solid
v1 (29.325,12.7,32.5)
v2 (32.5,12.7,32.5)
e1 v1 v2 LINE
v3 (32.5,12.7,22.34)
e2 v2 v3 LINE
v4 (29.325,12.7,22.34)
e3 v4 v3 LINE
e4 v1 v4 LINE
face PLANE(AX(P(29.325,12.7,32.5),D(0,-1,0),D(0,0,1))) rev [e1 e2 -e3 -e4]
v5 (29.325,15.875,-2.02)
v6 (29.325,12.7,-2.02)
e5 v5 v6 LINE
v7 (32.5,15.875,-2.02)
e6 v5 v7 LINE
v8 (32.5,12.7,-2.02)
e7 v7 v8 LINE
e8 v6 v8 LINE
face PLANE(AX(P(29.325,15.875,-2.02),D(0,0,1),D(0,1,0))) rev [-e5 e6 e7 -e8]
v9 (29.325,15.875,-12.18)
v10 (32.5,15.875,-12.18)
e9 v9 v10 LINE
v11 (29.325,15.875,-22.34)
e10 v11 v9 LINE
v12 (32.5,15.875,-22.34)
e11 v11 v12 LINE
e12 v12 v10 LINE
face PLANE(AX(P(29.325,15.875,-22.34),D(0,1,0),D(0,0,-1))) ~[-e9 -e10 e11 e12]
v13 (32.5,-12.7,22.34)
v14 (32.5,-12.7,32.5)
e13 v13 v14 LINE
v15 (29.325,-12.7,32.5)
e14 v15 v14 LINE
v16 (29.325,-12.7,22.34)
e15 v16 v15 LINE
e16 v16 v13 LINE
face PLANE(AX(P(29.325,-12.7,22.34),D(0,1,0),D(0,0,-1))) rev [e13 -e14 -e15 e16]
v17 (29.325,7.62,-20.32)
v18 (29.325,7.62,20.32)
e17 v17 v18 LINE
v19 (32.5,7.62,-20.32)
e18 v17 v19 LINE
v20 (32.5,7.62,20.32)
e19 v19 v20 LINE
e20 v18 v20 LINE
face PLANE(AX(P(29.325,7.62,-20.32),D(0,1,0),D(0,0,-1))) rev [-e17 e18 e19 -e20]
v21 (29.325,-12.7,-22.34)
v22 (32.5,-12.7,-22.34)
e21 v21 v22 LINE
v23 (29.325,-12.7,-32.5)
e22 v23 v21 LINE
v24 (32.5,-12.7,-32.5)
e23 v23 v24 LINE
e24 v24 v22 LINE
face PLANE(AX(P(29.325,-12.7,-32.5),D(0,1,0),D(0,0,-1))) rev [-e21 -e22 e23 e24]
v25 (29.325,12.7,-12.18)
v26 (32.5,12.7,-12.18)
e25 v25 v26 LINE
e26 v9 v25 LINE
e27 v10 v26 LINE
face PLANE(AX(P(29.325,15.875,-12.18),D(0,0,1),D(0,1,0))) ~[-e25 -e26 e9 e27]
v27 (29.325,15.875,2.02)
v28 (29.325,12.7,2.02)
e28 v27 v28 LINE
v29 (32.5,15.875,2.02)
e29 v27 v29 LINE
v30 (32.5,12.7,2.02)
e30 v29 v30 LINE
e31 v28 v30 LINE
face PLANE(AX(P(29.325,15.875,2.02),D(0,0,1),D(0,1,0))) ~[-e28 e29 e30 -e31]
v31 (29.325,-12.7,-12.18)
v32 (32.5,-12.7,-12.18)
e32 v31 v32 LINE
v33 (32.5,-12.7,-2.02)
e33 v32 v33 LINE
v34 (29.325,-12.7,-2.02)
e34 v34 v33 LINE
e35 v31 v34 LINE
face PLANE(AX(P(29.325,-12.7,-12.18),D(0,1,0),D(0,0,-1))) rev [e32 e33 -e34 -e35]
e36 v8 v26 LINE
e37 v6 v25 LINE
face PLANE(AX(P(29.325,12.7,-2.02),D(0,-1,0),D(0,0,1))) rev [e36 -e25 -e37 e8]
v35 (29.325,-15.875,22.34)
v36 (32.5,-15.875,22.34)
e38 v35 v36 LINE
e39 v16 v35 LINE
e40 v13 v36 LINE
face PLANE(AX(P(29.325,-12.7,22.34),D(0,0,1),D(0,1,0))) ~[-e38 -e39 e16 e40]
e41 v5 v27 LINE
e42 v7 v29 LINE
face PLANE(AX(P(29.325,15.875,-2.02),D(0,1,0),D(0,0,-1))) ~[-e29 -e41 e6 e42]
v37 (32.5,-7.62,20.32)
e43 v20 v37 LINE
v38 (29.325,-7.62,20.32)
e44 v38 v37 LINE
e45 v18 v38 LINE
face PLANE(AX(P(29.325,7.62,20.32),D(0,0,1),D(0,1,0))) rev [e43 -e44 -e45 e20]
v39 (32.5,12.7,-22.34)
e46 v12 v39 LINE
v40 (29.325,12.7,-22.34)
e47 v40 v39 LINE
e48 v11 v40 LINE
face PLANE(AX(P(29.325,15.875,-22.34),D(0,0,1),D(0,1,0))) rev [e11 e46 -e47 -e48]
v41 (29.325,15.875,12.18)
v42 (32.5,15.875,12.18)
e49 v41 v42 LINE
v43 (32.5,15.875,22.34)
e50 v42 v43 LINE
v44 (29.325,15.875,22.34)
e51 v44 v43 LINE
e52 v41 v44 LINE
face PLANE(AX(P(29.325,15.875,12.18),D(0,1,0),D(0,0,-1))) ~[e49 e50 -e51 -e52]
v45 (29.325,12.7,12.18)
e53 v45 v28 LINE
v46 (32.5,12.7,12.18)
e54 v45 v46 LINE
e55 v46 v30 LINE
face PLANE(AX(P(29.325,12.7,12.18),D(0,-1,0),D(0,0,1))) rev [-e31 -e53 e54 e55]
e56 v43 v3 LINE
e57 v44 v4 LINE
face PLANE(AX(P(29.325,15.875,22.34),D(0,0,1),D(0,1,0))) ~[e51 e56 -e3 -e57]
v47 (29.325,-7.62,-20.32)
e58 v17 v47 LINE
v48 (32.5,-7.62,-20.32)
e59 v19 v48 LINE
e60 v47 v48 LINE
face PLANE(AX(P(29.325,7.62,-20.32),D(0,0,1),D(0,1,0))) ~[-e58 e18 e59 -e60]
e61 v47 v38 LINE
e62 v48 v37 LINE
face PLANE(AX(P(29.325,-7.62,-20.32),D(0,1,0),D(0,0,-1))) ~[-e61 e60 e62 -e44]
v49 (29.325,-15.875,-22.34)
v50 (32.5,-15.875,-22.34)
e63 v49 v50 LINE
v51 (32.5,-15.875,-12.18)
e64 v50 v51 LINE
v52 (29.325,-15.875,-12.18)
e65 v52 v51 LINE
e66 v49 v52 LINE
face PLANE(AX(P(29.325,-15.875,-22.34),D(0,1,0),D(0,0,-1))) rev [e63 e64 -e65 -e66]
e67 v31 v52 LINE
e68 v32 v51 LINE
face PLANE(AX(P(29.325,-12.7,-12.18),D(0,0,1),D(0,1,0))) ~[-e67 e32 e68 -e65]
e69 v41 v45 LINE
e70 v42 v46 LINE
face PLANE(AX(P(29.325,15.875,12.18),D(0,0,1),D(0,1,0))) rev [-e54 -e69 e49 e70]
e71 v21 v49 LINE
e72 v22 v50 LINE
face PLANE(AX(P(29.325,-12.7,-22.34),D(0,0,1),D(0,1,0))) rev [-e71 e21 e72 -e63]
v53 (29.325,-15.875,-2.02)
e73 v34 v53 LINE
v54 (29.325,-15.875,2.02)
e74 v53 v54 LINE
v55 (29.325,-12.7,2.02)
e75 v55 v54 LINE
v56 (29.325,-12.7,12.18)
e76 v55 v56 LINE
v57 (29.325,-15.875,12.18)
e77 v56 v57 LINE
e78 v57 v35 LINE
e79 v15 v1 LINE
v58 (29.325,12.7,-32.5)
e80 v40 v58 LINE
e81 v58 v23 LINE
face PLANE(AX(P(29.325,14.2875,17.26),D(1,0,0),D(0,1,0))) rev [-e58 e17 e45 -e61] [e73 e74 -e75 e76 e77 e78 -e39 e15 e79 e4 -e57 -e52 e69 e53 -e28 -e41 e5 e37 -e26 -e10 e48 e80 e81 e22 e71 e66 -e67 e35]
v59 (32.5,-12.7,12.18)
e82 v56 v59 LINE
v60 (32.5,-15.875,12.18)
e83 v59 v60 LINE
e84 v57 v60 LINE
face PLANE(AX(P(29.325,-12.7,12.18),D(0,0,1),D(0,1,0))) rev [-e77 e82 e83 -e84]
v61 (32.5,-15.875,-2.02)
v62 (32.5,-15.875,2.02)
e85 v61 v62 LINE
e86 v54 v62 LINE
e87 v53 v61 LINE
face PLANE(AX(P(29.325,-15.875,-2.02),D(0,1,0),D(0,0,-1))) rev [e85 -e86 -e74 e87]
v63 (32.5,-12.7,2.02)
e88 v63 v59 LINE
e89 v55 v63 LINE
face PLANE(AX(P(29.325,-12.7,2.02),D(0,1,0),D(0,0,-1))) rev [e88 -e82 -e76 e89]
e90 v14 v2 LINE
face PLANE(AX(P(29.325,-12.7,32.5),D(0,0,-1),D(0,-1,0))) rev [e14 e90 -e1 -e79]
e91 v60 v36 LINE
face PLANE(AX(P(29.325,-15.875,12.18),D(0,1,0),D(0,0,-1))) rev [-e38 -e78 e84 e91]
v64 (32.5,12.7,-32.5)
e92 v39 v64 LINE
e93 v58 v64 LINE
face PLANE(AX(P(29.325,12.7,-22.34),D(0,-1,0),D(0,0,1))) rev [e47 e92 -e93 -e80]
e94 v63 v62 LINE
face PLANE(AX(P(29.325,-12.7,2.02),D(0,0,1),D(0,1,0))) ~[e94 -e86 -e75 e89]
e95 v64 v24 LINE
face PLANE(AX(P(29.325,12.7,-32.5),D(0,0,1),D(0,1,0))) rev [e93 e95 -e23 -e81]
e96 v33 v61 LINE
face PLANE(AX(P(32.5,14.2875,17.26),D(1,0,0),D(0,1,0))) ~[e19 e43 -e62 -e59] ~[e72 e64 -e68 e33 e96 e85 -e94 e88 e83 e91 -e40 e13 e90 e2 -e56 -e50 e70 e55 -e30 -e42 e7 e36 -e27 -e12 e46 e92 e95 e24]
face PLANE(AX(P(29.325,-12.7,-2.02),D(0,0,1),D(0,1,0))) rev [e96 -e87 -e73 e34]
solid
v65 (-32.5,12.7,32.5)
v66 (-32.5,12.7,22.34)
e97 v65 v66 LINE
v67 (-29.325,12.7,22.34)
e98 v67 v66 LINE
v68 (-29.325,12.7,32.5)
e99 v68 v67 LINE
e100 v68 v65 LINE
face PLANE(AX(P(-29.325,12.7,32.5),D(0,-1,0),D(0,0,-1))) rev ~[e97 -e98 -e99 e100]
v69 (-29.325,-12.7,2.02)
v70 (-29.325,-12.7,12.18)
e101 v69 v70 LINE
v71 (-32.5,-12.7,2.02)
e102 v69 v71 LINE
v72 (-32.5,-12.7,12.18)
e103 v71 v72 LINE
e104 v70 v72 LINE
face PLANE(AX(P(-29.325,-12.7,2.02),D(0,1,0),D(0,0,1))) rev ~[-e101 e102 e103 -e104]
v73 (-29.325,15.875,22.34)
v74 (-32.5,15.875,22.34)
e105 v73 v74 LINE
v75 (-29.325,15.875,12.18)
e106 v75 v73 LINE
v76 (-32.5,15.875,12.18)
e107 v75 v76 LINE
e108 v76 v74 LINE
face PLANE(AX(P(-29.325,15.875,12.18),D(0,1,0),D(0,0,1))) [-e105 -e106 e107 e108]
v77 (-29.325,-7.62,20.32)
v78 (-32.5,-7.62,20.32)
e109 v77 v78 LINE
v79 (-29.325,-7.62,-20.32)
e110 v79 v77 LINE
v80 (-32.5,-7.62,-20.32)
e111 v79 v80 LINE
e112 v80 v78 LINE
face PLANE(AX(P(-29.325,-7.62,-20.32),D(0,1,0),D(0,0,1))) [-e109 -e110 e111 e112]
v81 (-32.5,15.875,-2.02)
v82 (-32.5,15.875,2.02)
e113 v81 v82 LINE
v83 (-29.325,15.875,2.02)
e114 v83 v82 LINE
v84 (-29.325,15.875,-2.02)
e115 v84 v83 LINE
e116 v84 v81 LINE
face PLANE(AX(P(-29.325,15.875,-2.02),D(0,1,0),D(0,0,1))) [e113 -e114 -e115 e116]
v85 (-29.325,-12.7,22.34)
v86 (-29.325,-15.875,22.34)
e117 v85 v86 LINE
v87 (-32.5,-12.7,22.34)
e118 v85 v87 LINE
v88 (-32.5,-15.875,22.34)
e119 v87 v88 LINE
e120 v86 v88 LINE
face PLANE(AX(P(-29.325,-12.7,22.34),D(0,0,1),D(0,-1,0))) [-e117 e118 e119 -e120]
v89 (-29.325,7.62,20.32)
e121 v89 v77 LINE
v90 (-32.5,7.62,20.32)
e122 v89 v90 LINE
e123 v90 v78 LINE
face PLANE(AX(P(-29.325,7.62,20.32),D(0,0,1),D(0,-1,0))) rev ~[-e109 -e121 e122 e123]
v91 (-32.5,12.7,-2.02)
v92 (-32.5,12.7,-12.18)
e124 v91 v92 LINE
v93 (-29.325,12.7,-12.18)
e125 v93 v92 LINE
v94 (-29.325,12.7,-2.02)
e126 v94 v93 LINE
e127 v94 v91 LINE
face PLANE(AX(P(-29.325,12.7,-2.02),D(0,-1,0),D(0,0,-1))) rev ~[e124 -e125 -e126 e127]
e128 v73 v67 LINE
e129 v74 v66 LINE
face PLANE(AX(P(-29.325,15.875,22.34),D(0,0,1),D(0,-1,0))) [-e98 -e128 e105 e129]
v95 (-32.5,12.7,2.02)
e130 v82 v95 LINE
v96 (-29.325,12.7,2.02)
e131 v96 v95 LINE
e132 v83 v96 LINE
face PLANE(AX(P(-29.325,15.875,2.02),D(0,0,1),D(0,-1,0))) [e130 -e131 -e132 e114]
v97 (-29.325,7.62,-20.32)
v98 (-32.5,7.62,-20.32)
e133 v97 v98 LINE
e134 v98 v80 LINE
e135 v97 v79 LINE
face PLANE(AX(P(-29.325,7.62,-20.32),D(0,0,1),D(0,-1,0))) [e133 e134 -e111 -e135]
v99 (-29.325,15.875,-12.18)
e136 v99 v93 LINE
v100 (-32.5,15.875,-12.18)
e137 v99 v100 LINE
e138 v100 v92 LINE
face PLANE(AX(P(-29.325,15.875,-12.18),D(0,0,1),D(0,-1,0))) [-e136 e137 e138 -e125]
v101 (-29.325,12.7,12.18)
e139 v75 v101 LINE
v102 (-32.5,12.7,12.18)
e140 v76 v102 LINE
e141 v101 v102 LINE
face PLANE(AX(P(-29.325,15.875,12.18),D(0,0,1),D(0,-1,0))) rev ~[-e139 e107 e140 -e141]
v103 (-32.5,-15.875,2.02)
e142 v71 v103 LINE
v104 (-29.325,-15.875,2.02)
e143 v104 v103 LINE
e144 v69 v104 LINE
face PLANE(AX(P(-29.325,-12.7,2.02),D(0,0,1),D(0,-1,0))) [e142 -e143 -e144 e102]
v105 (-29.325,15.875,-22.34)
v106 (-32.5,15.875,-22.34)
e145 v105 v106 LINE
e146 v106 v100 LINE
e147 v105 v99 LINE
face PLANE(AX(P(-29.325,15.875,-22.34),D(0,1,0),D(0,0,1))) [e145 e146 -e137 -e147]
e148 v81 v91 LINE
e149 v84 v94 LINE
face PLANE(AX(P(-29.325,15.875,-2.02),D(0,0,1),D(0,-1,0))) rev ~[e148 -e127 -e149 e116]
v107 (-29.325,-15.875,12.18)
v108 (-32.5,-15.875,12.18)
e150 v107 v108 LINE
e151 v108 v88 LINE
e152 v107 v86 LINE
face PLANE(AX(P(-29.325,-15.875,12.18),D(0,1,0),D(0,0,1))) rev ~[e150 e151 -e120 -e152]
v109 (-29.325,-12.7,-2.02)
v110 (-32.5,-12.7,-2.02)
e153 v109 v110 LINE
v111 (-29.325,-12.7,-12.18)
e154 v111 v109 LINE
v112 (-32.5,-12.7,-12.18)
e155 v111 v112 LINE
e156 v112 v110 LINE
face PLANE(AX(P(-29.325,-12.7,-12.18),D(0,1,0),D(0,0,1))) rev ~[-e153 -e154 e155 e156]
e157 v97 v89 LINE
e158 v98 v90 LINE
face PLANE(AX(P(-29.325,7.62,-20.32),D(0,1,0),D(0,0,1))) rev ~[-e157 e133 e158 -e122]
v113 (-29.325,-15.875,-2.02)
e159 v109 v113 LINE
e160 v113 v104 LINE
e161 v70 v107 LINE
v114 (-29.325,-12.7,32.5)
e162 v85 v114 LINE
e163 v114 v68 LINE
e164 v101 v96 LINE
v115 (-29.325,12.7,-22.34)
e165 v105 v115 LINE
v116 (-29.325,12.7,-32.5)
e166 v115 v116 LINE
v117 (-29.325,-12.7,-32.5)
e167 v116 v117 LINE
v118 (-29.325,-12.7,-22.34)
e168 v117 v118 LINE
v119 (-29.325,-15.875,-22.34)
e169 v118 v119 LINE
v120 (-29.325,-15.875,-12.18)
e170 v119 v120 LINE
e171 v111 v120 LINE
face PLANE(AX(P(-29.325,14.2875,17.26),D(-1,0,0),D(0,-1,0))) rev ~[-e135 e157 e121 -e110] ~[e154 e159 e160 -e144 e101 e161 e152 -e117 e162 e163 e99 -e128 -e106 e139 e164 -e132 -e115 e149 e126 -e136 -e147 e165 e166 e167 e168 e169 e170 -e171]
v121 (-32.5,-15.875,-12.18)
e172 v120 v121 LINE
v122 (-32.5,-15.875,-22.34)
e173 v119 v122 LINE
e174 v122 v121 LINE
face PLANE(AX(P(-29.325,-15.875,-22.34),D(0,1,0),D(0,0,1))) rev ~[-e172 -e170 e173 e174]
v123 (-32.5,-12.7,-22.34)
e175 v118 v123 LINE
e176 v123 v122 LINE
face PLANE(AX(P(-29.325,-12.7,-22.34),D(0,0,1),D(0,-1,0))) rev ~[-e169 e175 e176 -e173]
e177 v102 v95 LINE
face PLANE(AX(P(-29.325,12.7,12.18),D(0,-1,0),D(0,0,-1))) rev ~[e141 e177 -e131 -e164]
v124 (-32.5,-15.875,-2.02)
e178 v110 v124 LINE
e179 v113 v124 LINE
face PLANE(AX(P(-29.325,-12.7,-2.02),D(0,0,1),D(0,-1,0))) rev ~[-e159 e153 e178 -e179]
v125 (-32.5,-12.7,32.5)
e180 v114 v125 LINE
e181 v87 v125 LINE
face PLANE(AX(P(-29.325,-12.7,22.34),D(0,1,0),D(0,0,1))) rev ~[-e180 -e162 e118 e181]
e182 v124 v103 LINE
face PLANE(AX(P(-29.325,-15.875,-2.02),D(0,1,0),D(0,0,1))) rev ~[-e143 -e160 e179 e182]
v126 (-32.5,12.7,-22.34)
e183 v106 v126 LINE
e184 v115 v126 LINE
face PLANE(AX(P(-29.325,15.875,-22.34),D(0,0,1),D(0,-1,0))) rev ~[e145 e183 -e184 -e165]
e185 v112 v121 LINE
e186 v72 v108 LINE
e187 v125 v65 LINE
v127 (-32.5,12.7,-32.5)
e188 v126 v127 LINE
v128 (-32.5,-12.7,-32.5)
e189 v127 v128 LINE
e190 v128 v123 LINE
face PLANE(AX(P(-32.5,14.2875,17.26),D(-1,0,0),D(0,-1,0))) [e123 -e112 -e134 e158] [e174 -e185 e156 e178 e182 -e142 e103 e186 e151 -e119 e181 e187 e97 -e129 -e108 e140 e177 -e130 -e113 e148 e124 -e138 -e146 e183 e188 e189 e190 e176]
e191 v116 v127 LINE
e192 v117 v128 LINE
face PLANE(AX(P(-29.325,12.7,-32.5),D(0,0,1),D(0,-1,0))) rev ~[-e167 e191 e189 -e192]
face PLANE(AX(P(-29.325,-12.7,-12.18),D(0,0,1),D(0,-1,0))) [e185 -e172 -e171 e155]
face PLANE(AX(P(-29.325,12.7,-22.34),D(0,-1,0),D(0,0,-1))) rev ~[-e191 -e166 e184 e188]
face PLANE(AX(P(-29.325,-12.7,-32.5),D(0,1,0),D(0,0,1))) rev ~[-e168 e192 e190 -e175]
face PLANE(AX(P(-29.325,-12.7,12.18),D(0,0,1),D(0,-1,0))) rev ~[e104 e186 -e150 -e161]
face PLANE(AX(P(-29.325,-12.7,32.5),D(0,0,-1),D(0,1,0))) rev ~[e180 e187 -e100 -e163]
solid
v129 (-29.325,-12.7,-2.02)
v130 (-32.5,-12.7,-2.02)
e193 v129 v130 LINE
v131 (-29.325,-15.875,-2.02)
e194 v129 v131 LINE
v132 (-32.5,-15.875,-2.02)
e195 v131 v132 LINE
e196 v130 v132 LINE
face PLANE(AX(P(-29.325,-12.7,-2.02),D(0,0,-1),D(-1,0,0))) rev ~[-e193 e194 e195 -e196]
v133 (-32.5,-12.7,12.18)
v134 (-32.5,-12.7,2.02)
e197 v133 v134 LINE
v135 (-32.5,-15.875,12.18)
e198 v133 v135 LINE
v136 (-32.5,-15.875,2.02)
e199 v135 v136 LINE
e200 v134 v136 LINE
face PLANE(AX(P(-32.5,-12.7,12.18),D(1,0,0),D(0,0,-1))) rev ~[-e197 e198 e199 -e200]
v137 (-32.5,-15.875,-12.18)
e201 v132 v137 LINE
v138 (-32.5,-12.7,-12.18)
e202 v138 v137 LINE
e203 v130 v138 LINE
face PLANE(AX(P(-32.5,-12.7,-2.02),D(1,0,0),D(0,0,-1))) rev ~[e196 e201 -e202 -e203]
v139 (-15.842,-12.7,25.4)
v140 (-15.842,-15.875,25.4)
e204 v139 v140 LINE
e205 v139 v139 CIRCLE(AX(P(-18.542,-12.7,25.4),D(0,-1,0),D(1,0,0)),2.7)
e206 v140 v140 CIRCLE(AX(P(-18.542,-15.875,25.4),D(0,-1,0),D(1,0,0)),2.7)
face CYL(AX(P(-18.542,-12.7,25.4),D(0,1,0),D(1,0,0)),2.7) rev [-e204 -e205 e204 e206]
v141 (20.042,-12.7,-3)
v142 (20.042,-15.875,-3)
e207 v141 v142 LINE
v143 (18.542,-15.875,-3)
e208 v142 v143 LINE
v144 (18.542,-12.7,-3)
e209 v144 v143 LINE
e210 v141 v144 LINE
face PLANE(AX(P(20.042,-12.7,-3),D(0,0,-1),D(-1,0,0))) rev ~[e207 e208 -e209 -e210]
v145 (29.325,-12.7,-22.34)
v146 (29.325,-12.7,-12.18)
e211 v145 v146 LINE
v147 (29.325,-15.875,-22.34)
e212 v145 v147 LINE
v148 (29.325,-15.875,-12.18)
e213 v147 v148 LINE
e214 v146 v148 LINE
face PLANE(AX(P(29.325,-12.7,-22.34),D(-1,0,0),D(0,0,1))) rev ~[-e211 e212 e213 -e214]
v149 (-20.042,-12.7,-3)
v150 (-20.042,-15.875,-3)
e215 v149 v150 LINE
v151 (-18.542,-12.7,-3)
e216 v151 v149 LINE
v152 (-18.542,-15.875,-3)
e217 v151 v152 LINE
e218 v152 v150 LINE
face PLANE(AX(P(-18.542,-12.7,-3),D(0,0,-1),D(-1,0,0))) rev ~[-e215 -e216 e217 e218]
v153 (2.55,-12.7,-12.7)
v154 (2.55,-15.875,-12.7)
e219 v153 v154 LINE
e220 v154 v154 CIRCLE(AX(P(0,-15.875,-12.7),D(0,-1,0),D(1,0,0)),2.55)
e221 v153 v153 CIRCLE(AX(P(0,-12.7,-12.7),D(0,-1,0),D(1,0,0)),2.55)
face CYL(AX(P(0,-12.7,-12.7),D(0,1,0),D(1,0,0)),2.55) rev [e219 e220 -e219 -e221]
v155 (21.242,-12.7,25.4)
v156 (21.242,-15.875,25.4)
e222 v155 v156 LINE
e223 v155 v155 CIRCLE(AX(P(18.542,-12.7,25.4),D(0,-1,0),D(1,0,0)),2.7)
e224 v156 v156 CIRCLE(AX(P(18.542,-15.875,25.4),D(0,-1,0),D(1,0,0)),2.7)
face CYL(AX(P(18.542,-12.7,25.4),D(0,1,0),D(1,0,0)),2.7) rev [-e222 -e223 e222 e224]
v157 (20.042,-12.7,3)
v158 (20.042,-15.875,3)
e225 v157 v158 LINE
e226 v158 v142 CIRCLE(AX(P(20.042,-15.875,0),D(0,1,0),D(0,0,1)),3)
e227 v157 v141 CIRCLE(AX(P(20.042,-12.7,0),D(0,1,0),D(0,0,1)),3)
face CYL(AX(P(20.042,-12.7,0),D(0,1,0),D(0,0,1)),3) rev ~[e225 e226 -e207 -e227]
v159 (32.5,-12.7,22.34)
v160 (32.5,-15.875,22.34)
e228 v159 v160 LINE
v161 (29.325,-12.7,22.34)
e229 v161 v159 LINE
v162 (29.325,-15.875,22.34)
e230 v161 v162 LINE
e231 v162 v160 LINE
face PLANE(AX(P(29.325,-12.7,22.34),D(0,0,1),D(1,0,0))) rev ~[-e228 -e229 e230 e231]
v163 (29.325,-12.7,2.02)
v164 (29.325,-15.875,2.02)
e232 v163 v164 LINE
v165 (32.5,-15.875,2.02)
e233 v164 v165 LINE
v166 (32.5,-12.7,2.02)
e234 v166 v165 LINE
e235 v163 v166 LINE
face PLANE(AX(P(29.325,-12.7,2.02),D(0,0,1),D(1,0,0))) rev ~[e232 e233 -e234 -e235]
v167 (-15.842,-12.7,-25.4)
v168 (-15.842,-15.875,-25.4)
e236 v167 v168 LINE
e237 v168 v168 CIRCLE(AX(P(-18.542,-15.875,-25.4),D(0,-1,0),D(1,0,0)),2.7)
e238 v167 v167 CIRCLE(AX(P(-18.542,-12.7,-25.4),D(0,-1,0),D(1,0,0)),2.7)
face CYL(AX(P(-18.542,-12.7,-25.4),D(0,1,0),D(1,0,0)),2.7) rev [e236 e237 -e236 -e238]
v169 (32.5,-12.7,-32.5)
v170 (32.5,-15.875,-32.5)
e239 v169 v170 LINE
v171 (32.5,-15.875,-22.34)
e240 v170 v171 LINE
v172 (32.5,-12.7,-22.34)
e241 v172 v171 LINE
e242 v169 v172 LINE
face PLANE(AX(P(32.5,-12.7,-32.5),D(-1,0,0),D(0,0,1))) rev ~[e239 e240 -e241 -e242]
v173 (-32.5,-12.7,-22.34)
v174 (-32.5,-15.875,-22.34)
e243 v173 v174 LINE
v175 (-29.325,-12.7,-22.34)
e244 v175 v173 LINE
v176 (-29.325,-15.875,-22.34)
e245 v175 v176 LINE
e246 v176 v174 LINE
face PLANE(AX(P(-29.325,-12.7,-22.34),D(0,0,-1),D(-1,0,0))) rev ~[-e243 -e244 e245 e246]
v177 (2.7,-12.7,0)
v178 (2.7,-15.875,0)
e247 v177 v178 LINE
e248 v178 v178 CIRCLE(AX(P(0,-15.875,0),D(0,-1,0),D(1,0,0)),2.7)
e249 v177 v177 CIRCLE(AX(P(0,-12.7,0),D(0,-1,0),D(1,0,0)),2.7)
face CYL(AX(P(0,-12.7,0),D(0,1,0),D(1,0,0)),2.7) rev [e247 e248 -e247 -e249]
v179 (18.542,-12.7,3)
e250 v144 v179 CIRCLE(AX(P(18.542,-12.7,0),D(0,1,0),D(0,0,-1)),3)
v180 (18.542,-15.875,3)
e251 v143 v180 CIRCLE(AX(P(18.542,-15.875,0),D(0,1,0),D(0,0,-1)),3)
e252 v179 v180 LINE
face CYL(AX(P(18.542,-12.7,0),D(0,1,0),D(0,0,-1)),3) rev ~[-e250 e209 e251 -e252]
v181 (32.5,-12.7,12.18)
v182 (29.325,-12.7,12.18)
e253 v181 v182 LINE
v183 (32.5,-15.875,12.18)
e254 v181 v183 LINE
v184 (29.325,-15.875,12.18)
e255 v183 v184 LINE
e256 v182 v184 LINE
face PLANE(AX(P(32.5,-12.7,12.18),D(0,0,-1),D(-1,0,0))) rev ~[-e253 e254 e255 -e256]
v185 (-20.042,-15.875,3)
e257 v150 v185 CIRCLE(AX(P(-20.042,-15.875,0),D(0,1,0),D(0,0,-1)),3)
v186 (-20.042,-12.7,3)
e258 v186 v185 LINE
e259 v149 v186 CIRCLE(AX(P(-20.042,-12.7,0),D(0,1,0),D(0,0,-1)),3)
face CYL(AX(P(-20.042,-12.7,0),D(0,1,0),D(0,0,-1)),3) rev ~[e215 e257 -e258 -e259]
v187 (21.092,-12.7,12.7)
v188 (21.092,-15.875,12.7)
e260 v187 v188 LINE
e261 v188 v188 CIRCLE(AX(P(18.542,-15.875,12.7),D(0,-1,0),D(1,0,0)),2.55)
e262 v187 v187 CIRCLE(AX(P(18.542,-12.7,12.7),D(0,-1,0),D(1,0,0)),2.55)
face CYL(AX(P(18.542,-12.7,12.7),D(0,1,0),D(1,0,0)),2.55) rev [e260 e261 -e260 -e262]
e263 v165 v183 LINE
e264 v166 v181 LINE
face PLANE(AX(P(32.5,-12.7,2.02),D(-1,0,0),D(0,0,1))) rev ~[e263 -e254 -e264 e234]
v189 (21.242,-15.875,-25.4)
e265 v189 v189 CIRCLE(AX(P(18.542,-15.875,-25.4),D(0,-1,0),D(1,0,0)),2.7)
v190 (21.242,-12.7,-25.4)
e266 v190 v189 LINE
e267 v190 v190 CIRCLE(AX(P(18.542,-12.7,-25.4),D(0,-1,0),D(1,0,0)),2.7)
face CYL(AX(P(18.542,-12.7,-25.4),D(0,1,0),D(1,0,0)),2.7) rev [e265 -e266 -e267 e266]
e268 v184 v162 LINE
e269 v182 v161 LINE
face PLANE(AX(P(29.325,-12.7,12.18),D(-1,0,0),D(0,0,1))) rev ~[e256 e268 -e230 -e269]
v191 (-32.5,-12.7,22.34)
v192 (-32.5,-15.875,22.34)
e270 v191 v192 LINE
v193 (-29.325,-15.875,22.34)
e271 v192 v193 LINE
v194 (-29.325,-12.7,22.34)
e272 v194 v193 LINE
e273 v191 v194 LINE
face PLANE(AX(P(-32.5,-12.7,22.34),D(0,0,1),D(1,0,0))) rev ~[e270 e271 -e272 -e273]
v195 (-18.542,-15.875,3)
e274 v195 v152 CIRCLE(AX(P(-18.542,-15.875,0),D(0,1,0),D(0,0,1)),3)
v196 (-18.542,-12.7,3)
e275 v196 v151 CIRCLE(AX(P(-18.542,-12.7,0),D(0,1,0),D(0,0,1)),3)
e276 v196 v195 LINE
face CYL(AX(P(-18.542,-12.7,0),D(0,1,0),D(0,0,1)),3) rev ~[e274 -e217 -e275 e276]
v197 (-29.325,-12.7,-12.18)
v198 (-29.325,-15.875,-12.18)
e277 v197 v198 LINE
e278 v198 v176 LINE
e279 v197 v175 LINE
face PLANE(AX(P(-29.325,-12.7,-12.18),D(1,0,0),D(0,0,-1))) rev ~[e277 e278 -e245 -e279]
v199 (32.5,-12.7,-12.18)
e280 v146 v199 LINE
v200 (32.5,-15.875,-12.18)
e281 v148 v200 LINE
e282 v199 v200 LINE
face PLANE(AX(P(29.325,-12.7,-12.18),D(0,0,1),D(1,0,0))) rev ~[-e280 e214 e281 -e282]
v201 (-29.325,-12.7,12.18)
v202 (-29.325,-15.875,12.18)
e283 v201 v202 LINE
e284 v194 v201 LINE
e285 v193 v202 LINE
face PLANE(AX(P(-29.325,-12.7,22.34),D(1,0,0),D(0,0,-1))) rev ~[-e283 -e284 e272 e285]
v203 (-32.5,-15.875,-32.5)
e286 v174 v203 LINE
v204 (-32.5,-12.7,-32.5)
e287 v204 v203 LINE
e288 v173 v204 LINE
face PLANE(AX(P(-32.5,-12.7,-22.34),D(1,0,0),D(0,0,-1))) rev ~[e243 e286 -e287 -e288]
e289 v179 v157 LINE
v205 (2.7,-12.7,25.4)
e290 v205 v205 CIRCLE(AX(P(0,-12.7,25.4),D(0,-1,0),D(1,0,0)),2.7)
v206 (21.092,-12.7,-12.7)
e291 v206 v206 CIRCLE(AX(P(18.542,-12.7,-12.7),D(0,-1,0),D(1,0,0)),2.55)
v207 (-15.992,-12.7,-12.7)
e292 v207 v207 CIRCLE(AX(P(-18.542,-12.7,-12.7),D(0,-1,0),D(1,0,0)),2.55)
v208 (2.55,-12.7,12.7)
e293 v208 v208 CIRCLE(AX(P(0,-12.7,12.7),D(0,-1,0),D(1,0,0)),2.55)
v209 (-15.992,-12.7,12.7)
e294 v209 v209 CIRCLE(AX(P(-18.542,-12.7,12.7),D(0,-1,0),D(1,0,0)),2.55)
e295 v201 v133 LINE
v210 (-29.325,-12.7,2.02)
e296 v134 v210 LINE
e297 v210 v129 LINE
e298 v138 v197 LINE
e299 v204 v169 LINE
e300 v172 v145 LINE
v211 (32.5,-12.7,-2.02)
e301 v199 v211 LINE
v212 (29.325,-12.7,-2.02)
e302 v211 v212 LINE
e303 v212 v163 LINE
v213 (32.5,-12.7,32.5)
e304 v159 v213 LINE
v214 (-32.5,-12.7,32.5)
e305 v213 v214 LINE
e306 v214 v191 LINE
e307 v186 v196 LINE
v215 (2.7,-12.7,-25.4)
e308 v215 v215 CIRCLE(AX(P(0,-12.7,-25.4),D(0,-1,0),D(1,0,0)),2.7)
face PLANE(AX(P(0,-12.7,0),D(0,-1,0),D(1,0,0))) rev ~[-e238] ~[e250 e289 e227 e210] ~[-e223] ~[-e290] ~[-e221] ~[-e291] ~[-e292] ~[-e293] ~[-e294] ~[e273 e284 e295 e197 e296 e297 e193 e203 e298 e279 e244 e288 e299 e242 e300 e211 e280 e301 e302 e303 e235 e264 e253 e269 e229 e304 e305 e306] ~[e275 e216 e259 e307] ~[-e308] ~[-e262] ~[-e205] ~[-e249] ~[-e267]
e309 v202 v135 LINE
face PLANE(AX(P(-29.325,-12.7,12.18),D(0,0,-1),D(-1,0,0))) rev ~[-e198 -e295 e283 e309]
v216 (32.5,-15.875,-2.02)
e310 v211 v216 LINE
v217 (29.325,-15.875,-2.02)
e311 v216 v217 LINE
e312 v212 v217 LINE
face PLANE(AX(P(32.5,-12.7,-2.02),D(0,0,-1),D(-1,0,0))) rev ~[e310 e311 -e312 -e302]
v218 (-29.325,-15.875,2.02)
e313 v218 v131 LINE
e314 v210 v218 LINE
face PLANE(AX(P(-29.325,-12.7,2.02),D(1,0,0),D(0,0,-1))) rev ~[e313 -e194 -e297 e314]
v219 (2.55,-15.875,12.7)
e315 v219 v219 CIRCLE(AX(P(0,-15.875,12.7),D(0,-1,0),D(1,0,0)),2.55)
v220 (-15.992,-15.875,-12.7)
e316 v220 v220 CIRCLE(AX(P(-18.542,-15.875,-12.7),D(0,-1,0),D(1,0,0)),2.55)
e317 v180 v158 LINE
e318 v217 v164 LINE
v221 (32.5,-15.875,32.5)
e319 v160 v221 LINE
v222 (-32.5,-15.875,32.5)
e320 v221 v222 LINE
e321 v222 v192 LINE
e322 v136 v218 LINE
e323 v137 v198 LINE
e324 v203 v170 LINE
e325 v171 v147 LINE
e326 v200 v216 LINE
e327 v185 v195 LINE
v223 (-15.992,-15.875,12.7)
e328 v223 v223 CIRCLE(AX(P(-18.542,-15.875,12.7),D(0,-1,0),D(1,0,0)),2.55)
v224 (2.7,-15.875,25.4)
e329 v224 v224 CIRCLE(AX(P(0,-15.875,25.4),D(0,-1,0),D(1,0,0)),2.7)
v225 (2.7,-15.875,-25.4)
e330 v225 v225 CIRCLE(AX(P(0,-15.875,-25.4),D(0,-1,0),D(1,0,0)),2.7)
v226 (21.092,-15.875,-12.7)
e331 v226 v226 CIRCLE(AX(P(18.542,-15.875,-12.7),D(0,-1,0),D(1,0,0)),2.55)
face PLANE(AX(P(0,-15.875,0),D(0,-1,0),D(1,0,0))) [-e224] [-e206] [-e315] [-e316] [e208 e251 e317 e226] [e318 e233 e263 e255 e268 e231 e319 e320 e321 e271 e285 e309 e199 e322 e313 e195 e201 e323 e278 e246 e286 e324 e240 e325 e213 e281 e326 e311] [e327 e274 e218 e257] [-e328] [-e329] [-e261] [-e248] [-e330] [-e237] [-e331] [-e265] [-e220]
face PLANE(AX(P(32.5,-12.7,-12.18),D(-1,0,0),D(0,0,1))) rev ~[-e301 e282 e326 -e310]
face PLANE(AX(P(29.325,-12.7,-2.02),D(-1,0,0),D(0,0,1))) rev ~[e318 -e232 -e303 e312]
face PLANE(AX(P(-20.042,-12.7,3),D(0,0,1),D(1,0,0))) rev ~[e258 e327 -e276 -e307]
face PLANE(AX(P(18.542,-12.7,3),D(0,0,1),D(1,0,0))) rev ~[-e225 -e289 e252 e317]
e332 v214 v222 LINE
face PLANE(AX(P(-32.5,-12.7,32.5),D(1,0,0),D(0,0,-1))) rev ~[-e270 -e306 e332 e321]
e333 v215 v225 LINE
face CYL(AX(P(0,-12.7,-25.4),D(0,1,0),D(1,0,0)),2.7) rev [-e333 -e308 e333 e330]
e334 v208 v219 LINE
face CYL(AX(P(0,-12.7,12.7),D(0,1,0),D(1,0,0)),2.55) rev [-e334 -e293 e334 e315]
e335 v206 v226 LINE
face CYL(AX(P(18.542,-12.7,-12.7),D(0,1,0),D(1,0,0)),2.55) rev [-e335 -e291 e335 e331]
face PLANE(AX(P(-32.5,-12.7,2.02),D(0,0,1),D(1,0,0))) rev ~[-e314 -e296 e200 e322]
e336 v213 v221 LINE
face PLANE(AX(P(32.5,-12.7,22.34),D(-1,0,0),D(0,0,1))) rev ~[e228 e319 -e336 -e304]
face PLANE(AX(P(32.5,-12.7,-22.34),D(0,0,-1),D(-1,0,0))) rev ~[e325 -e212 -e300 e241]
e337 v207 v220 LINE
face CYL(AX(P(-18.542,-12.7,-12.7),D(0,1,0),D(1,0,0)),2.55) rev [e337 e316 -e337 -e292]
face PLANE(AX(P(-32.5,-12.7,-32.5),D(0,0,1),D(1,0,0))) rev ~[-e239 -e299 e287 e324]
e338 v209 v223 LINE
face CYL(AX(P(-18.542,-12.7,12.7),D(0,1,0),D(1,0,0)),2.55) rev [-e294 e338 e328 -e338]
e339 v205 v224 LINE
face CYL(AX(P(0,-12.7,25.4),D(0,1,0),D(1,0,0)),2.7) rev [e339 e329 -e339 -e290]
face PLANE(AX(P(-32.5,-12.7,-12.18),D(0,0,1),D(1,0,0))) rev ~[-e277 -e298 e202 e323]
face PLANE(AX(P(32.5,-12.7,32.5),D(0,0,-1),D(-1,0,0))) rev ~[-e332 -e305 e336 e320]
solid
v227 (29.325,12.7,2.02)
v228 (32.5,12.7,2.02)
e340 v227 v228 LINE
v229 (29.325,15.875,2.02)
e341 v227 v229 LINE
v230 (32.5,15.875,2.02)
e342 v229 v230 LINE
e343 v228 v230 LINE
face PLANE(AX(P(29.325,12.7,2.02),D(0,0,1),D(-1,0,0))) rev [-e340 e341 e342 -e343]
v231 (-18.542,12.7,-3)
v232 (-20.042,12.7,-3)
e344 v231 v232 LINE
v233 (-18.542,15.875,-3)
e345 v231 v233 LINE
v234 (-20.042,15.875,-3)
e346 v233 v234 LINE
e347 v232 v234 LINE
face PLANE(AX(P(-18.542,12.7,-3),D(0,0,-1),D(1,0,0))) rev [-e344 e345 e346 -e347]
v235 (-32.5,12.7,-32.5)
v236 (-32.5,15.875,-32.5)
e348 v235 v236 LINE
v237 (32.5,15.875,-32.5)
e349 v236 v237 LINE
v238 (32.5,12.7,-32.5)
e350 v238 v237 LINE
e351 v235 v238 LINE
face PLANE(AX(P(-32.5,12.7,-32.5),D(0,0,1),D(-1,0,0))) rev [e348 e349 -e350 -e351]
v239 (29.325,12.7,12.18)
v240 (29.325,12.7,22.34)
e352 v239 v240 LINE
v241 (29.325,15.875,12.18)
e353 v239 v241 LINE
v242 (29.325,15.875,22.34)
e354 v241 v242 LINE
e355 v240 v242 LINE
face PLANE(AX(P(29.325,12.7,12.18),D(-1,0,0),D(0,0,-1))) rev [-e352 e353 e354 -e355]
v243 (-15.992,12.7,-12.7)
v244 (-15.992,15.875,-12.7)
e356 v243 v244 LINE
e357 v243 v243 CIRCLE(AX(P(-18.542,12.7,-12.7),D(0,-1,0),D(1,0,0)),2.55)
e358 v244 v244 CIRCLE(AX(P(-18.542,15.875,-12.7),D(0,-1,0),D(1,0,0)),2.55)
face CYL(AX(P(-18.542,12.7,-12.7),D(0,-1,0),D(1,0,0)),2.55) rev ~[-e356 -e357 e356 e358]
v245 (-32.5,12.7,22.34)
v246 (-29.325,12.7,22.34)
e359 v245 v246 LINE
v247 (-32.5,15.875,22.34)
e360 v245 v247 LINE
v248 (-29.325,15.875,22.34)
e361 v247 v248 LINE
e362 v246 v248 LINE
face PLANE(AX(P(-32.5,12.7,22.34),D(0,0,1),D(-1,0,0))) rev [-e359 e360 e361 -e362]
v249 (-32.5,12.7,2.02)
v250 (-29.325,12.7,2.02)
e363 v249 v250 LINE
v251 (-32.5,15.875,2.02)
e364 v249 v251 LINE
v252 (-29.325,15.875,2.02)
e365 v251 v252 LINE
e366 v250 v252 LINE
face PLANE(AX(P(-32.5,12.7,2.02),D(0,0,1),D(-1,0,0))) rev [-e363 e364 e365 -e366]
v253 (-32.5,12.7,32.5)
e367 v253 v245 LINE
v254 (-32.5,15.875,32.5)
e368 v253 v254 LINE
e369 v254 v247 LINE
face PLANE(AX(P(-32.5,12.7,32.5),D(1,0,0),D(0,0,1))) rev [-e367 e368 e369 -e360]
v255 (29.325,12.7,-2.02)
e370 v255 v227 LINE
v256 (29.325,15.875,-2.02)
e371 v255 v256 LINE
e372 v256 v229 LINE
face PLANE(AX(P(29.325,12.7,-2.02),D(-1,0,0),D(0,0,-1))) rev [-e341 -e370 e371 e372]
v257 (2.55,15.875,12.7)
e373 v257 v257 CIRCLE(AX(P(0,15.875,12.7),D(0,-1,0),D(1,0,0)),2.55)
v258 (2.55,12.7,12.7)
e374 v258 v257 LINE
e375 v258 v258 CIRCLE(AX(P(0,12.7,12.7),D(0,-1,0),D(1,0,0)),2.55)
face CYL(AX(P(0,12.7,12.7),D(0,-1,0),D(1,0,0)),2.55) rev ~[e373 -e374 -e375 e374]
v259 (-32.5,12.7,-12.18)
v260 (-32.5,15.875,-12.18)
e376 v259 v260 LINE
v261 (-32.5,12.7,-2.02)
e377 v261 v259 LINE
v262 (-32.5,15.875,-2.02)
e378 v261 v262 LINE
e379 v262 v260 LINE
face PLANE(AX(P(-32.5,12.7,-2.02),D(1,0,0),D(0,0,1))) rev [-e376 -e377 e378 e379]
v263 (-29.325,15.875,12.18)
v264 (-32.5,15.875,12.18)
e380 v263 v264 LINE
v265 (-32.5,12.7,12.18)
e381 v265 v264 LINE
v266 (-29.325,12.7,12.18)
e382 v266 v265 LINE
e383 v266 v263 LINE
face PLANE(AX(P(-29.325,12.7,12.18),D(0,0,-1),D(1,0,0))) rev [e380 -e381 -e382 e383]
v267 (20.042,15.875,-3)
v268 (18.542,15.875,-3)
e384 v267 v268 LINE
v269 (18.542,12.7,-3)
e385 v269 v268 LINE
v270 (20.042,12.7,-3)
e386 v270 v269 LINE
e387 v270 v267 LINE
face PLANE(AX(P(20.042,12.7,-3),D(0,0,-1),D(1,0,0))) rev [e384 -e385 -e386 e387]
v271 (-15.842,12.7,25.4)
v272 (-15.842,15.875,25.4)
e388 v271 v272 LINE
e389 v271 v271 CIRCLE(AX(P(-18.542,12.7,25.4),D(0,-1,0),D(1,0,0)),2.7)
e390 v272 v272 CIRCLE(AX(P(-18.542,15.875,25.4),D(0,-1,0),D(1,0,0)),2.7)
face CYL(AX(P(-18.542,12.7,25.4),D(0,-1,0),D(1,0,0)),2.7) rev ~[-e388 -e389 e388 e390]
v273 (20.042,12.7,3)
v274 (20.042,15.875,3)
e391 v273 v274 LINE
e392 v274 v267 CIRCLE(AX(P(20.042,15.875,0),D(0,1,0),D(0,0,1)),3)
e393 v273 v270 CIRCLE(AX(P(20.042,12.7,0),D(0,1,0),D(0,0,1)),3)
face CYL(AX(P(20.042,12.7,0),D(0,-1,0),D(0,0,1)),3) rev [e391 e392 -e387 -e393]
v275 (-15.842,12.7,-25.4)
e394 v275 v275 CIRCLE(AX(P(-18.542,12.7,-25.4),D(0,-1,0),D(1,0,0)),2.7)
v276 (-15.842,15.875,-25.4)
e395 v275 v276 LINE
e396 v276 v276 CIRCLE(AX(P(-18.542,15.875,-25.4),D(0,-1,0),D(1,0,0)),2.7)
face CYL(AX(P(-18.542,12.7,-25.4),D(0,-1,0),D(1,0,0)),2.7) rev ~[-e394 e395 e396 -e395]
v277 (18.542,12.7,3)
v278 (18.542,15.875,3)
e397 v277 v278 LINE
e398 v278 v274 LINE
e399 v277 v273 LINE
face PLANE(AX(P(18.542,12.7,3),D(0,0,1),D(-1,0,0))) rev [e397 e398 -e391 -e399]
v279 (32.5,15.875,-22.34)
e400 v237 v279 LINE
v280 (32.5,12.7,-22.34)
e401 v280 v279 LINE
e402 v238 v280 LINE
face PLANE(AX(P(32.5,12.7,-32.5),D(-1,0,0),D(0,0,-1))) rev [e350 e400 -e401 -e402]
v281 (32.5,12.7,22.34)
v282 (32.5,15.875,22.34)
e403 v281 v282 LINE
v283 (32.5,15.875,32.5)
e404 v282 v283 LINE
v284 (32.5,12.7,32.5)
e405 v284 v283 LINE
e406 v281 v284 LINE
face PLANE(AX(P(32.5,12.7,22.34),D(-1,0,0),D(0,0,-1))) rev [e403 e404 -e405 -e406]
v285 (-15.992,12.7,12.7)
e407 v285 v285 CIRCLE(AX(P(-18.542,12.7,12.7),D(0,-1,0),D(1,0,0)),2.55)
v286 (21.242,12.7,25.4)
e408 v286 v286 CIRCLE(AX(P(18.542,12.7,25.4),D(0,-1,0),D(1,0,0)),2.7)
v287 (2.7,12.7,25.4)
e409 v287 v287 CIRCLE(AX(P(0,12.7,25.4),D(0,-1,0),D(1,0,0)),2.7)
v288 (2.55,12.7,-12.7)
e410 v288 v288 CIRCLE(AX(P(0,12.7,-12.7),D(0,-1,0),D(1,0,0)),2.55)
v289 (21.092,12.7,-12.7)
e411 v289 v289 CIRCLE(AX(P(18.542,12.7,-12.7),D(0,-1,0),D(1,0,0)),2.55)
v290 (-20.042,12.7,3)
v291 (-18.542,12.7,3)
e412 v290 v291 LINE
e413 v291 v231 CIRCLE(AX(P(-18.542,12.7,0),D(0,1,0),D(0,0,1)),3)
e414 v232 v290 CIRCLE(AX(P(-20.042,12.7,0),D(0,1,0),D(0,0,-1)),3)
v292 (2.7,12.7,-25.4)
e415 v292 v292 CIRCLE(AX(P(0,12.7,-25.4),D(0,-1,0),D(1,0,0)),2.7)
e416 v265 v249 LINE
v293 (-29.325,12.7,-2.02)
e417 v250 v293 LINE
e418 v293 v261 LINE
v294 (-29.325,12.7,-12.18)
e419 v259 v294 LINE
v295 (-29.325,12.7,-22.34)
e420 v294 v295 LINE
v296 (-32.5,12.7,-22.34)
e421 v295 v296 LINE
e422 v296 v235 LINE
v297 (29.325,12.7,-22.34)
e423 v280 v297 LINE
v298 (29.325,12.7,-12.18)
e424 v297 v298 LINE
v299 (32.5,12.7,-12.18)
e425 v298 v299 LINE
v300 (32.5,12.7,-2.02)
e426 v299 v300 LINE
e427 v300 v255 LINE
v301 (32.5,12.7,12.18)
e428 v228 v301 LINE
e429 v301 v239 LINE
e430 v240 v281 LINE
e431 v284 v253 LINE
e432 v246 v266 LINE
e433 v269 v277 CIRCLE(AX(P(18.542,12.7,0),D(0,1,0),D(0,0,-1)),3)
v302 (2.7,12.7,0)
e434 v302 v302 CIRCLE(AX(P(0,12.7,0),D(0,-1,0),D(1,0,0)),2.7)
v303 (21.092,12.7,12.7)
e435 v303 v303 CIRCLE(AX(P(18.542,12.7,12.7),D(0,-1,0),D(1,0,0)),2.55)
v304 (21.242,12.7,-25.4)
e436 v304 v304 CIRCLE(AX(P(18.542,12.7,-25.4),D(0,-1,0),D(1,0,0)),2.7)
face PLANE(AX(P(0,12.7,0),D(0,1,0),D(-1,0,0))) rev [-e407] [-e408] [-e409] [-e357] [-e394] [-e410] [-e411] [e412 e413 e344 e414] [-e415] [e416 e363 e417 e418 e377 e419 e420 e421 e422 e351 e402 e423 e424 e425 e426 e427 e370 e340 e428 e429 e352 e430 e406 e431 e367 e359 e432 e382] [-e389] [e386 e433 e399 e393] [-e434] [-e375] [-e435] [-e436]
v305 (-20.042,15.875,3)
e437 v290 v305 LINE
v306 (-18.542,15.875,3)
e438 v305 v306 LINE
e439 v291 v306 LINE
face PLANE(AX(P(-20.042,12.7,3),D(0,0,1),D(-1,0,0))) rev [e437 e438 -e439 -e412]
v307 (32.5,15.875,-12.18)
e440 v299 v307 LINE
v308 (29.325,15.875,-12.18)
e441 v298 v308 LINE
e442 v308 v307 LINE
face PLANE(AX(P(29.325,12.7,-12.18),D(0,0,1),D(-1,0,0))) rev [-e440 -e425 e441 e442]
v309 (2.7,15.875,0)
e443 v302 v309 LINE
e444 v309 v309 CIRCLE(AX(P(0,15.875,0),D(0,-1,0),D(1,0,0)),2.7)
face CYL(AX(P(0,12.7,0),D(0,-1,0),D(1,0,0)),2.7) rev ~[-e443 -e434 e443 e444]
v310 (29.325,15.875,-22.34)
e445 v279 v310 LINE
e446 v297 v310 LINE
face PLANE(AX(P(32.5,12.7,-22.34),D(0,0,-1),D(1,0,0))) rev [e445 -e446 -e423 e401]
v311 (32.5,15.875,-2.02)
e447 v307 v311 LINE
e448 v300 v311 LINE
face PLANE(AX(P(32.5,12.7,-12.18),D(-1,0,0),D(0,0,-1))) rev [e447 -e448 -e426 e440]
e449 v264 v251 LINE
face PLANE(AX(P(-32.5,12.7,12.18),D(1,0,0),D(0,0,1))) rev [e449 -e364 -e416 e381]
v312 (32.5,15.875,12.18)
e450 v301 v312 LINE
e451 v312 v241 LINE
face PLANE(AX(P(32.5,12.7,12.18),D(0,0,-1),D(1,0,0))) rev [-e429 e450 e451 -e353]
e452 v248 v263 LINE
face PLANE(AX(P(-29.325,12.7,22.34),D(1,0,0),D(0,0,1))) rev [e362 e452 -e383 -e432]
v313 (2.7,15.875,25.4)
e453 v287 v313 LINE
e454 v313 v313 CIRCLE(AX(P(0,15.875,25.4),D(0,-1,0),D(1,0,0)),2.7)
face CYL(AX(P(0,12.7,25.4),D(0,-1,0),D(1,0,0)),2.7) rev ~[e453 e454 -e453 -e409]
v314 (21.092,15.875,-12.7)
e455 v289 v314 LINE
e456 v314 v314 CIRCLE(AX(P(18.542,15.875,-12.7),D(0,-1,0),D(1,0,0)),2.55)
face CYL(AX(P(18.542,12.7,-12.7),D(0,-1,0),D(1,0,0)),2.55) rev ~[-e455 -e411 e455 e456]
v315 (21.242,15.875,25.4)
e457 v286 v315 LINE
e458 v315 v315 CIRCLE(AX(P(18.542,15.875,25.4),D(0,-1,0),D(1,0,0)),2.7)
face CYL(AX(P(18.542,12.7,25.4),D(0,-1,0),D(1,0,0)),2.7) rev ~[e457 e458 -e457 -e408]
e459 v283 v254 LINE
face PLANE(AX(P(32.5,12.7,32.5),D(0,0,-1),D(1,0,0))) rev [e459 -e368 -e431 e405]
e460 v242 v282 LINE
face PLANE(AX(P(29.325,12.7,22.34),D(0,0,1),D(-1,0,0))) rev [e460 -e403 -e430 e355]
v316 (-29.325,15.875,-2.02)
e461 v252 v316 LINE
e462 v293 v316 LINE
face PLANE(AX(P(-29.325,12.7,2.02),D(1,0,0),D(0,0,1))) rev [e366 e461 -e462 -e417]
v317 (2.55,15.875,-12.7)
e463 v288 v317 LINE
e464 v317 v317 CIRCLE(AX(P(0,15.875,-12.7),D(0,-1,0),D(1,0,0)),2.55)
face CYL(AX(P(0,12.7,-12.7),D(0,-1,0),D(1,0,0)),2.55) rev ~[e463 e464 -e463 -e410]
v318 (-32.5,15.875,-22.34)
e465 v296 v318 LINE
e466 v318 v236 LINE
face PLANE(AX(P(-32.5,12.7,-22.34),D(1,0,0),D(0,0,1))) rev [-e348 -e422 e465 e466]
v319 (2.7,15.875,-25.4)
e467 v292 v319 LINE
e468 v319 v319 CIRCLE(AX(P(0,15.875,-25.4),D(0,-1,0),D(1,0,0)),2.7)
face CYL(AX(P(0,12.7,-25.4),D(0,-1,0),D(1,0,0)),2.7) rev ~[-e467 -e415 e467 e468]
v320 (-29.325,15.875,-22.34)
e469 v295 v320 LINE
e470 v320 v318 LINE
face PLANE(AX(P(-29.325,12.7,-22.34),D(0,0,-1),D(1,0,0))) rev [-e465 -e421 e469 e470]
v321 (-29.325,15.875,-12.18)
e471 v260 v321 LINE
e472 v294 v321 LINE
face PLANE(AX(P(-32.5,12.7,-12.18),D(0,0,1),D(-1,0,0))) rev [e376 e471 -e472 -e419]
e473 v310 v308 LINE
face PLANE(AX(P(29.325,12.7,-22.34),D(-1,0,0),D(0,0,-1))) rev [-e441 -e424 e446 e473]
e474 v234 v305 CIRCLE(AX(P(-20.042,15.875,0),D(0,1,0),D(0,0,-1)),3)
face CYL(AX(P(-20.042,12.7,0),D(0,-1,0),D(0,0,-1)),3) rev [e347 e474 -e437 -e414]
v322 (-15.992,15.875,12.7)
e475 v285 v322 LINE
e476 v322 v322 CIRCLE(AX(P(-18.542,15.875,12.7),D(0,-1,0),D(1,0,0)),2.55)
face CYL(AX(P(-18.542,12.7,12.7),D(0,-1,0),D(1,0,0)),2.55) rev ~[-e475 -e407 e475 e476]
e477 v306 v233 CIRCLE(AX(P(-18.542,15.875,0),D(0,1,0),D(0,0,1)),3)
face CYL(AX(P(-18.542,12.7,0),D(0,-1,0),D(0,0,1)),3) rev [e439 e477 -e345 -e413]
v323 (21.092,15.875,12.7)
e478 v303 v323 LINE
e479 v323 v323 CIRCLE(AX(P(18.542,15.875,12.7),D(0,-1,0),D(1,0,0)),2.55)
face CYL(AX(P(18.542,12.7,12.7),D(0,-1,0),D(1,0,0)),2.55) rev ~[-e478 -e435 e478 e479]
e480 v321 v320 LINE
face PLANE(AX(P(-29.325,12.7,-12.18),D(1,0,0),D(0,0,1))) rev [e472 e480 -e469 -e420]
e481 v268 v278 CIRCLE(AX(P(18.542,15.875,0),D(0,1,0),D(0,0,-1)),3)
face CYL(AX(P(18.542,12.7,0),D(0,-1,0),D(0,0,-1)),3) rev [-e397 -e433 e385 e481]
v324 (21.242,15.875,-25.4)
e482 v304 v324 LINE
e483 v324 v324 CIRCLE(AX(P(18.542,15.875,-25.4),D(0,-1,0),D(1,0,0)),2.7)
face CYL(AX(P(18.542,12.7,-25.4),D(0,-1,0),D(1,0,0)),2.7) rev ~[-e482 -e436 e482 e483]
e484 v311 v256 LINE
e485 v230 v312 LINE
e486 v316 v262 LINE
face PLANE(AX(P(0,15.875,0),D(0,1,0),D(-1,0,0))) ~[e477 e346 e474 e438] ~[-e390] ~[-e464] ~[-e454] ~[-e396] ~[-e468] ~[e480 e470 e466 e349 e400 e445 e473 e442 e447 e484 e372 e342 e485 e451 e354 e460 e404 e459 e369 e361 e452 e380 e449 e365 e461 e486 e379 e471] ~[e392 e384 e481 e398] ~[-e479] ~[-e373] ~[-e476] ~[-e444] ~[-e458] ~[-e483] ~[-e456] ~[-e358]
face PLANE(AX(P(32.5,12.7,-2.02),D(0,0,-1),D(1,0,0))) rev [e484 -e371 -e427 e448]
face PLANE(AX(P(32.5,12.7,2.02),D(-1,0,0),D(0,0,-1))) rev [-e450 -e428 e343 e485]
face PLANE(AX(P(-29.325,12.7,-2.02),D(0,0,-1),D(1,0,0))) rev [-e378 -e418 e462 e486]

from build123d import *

# Parameters (mm, degrees)
F2_R     = 2.7
F2_R_2   = 2.55
F3_DEPTH = 3.175
F6_W     = 3.175
F6_H     = 10.16
F6_H_2   = 4.04
F6_W_2   = 15.24
F6_H_3   = 40.64
F7_DEPTH = 3.175


# Not quite as in the source:
# - a variable given as a bare number and used for a length is read in inches; the dataset says mm whatever the document's units were
# - a feature names something its author has since deleted; it is built from what else it names


with BuildPart() as f3:
    # F2 (on offset) → F3 (new body)
    with BuildSketch(Plane.XZ.offset(12.7)):
        Polygon((32.5, 22.34), (32.5, 32.5), (-32.5, 32.5), (-32.5, 22.34), (-29.325, 22.34), (-29.325, 12.18), (-32.5, 12.18), (-32.5, 2.02), (-29.325, 2.02), (-29.325, 0), (-29.325, -2.02), (-32.5, -2.02), (-32.5, -12.18), (-29.325, -12.18), (-29.325, -22.34), (-32.5, -22.34), (-32.5, -32.5), (32.5, -32.5), (32.5, -22.34), (29.325, -22.34), (29.325, -12.18), (32.5, -12.18), (32.5, -2.02), (29.325, -2.02), (29.325, 0), (29.325, 2.02), (32.5, 2.02), (32.5, 12.18), (29.325, 12.18), (29.325, 22.34), align=None)
        with Locations((-18.542, -25.4)):
            Circle(F2_R, mode=Mode.SUBTRACT)
        with Locations((-18.542, -12.7)):
            Circle(F2_R_2, mode=Mode.SUBTRACT)
        with Locations((0, -25.4)):
            Circle(F2_R, mode=Mode.SUBTRACT)
        with Locations((18.542, -25.4)):
            Circle(F2_R, mode=Mode.SUBTRACT)
        with Locations((0, -12.7)):
            Circle(F2_R_2, mode=Mode.SUBTRACT)
        with Locations((18.542, -12.7)):
            Circle(F2_R_2, mode=Mode.SUBTRACT)
        with BuildLine():
            Line((-18.542, -3), (-20.042, -3))
            ThreePointArc((-20.042, -3), (-23.042, 0), (-20.042, 3))
            Line((-20.042, 3), (-18.542, 3))
            ThreePointArc((-18.542, 3), (-15.542, 0), (-18.542, -3))
        make_face(mode=Mode.SUBTRACT)
        with Locations((-18.542, 12.7)):
            Circle(F2_R_2, mode=Mode.SUBTRACT)
        with Locations((-18.542, 25.4)):
            Circle(F2_R, mode=Mode.SUBTRACT)
        Circle(F2_R, mode=Mode.SUBTRACT)
        with Locations((0, 12.7)):
            Circle(F2_R_2, mode=Mode.SUBTRACT)
        with BuildLine():
            ThreePointArc((18.542, -3), (15.542, 0), (18.542, 3))
            Line((18.542, 3), (20.042, 3))
            ThreePointArc((20.042, 3), (23.042, 0), (20.042, -3))
            Line((20.042, -3), (18.542, -3))
        make_face(mode=Mode.SUBTRACT)
        with Locations((18.542, 12.7)):
            Circle(F2_R_2, mode=Mode.SUBTRACT)
        with Locations((0, 25.4)):
            Circle(F2_R, mode=Mode.SUBTRACT)
        with Locations((18.542, 25.4)):
            Circle(F2_R, mode=Mode.SUBTRACT)
    extrude(amount=F3_DEPTH)


with BuildPart() as f4_1:
    # F4: instance of F3
    add(f3.part.mirror(Plane.XZ))


with BuildPart() as f7:
    # F6 (on face) → F7 (new body)
    with BuildSketch(Plane(origin=(-29.325, 0, 0), x_dir=(0, -1, 0), z_dir=(-1, 0, 0))):
        with Locations((-14.2875, 17.26)):
            Rectangle(F6_W, F6_H)
        with Locations((-14.2875, 0)):
            Rectangle(F6_W, F6_H_2)
        Polygon((-12.7, 22.34), (-12.7, 12.18), (-12.7, 2.02), (-12.7, -2.02), (-12.7, -12.18), (-12.7, -22.34), (-12.7, -32.5), (12.7, -32.5), (12.7, -22.34), (12.7, -12.18), (12.7, -2.02), (12.7, 2.02), (12.7, 12.18), (12.7, 22.34), (12.7, 32.5), (-12.7, 32.5), align=None)
        Rectangle(F6_W_2, F6_H_3, mode=Mode.SUBTRACT)
        with Locations((14.2875, -17.26)):
            Rectangle(F6_W, F6_H)
        with Locations((14.2875, 0)):
            Rectangle(F6_W, F6_H_2)
        with Locations((14.2875, 17.26)):
            Rectangle(F6_W, F6_H)
        with Locations((-14.2875, -17.26)):
            Rectangle(F6_W, F6_H)
    extrude(amount=F7_DEPTH)


with BuildPart() as f8_1:
    # F8: instance of F7
    add(f7.part.mirror(Plane.YZ))


solid = Compound([f3.part, f4_1.part, f7.part, f8_1.part])
